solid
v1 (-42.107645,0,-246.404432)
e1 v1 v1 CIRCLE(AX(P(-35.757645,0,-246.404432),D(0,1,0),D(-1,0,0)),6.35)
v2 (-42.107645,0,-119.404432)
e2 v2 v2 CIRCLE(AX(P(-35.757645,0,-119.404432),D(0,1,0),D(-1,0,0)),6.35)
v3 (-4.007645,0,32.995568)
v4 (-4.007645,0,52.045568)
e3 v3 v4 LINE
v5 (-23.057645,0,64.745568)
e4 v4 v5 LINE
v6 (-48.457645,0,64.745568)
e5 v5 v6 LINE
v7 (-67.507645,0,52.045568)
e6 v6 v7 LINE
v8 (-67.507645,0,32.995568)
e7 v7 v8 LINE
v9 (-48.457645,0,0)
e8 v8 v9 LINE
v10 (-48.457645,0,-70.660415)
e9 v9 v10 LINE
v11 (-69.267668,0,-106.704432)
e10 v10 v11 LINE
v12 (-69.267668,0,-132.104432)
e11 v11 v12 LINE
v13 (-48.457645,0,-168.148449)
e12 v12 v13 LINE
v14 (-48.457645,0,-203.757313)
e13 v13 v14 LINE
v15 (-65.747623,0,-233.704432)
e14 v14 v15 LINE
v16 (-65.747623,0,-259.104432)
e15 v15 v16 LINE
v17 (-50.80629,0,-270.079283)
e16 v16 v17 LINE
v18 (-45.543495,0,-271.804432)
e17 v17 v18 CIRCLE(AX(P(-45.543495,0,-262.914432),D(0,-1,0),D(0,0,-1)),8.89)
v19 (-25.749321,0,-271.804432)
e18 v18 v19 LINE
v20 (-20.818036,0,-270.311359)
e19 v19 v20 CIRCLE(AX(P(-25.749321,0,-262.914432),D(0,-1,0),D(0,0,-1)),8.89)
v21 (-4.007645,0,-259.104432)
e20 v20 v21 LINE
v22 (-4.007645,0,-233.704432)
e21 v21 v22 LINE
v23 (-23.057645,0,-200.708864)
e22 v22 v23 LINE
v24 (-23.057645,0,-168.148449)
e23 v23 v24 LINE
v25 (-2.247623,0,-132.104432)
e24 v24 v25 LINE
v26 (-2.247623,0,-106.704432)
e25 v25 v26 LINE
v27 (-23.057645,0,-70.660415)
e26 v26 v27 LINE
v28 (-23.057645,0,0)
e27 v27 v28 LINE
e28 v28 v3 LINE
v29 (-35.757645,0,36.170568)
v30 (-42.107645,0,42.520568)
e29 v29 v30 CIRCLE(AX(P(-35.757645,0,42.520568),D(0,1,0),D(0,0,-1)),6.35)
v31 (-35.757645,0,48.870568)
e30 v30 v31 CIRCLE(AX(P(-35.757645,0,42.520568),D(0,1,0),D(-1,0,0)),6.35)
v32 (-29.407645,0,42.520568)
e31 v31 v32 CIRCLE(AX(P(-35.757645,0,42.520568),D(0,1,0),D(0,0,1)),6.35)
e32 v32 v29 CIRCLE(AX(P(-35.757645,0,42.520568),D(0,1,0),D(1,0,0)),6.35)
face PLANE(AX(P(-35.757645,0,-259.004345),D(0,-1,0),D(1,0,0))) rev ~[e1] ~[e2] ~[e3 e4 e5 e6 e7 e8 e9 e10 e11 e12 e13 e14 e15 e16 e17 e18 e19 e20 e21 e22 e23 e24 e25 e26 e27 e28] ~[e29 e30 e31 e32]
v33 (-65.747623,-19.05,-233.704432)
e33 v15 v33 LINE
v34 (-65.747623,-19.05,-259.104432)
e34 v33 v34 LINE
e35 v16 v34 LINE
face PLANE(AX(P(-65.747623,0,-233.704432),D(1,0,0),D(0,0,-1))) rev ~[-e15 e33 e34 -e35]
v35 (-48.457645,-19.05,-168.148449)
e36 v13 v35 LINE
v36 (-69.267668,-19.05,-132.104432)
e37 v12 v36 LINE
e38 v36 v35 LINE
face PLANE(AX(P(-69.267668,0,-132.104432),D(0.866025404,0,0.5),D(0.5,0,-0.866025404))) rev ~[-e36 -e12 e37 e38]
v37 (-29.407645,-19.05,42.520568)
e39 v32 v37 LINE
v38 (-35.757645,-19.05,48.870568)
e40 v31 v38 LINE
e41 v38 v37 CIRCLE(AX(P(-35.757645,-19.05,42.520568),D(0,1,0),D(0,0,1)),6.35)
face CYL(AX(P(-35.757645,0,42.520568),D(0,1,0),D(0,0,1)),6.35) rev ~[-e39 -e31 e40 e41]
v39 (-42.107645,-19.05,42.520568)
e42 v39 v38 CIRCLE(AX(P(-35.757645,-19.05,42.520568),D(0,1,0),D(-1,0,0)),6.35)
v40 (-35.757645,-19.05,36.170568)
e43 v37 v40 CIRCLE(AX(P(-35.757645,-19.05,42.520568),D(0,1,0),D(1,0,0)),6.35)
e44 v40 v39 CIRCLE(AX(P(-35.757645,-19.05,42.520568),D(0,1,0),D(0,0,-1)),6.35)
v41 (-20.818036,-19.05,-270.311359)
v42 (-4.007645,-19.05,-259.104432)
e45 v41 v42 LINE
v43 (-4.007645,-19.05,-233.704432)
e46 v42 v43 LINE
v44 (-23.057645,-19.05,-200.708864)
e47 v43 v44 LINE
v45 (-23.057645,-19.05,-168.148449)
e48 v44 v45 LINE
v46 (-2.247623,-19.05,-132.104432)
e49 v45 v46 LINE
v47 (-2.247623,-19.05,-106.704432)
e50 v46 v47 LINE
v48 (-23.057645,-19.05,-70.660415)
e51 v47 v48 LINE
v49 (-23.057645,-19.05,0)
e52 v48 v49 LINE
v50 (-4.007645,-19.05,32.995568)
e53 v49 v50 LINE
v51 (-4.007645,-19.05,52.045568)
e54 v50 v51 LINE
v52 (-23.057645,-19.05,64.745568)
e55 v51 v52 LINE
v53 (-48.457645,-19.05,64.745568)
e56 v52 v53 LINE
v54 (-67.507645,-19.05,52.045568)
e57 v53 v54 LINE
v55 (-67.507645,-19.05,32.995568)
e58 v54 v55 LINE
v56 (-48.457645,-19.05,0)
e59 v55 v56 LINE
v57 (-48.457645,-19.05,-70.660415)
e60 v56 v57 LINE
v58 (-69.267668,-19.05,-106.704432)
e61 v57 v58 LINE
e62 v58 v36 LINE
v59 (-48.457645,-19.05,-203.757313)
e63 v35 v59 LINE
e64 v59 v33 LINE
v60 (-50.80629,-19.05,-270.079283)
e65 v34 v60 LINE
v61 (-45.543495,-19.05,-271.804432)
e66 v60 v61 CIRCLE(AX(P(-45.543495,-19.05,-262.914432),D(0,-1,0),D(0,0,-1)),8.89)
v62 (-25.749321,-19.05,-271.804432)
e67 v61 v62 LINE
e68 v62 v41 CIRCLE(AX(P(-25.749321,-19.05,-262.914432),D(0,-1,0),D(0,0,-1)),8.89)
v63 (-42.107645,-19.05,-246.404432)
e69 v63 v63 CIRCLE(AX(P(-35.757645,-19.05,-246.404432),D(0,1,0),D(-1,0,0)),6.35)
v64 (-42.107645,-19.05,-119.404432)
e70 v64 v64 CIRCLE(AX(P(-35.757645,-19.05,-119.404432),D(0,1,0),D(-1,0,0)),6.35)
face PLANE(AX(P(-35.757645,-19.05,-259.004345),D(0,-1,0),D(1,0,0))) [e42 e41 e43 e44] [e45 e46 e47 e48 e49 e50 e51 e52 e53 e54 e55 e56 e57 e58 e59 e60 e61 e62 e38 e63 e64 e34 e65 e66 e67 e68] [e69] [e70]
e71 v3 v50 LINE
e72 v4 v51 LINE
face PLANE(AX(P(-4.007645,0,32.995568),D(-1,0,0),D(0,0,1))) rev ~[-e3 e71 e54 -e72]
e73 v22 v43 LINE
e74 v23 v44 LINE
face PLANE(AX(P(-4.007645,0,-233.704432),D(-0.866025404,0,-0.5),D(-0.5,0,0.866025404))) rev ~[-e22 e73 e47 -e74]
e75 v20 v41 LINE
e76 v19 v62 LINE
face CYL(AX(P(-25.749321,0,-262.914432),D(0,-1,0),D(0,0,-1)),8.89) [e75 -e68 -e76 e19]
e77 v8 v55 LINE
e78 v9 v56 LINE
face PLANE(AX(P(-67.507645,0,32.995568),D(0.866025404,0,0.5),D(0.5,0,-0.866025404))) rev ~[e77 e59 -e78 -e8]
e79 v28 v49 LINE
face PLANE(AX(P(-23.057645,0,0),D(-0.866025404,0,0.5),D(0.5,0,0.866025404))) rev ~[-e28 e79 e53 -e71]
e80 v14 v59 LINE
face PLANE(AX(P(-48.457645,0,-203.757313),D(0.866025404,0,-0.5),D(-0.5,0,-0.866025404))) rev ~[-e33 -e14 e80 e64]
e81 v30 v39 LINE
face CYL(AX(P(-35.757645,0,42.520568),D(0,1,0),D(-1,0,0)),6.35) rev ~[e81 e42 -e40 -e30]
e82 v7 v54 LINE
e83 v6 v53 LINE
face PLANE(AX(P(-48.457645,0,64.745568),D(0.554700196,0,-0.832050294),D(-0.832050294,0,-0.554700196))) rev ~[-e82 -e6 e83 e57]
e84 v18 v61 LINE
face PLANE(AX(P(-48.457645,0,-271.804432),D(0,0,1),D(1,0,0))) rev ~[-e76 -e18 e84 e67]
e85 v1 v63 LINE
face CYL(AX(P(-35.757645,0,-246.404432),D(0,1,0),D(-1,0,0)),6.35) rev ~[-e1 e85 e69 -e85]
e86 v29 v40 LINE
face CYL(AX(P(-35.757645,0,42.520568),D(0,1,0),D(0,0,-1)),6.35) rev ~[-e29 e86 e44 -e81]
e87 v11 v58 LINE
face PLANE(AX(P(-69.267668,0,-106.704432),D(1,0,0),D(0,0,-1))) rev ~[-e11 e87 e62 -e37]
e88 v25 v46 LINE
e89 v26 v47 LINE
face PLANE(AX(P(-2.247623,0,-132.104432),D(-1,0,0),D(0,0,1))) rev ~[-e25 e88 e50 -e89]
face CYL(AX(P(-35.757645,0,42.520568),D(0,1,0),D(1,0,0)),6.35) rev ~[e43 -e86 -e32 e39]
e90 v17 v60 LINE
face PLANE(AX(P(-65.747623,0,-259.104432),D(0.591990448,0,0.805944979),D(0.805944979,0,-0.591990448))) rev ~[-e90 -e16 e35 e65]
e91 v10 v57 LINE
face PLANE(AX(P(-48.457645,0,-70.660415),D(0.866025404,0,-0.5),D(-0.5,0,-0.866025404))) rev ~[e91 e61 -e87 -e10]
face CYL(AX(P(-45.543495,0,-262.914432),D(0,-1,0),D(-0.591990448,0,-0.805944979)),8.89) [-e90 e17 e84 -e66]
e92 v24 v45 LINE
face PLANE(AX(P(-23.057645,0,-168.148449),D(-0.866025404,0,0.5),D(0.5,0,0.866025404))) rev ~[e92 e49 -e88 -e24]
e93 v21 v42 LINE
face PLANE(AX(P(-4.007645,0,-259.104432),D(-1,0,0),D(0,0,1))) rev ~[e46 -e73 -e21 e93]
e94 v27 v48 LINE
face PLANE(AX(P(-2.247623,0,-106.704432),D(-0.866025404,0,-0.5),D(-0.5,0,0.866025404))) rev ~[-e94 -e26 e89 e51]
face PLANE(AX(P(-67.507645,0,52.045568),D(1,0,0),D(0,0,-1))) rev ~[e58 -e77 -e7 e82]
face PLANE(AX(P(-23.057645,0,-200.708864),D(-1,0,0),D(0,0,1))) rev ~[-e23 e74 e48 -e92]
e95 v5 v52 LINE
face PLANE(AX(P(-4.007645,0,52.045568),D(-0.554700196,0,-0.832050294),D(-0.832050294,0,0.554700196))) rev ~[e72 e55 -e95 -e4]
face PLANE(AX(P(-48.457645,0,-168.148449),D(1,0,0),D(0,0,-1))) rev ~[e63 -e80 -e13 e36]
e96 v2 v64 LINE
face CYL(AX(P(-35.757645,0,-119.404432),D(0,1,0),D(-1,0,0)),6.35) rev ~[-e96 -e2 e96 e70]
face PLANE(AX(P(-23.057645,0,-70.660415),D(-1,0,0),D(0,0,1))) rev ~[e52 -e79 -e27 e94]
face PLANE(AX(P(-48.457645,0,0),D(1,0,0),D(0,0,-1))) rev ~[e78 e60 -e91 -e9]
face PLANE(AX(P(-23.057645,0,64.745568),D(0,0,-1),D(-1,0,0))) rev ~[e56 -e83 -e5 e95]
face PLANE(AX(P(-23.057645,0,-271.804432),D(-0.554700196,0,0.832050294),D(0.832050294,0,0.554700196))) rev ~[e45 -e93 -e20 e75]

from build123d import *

# Parameters (mm, degrees)
F0_W     = 17.2899770278
F0_H     = 12.7
F0_W_2   = 19.05
F0_W_3   = 20.8100229722
F0_H_2   = 9.525
F1_DEPTH = 19.05
F2_R     = 8.89


# Not quite as in the source:
# - a feature names something its author has since deleted; it is built from what else it names


with BuildPart() as f1:
    # F0 (on Front) → F1 (new body)
    with BuildSketch(Plane.XZ):
        with BuildLine():
            Line((-48.4576454937, -259.1044321158), (-48.4576454937, -271.8044321158))
            Line((-48.4576454937, -271.8044321158), (-23.0576454937, -271.8044321158))
            Line((-23.0576454937, -271.8044321158), (-23.0576454937, -259.1044321158))
            Line((-23.0576454937, -259.1044321158), (-23.0576454937, -246.4044321158))
            Line((-23.0576454937, -246.4044321158), (-29.4076454937, -246.4044321158))
            ThreePointArc((-29.4076454937, -246.4044321158), (-35.7576454937, -252.7544321158), (-42.1076454937, -246.4044321158))
            Line((-42.1076454937, -246.4044321158), (-48.4576454937, -246.4044321158))
            Line((-48.4576454937, -246.4044321158), (-48.4576454937, -259.1044321158))
        make_face()
        Polygon((-65.7476225216, -259.1044321158), (-48.4576454937, -271.8044321158), (-48.4576454937, -259.1044321158), align=None)
        Polygon((-23.0576454937, -259.1044321158), (-23.0576454937, -271.8044321158), (-4.0076454937, -259.1044321158), align=None)
        with Locations((-57.1026340077, -252.7544321158)):
            Rectangle(F0_W, F0_H)
        with Locations((-13.5326454937, -252.7544321158)):
            Rectangle(F0_W_2, F0_H)
        with Locations((-57.1026340077, -240.0544321158)):
            Rectangle(F0_W, F0_H)
        with BuildLine():
            Line((-48.4576454937, -233.7044321158), (-48.4576454937, -246.4044321158))
            Line((-48.4576454937, -246.4044321158), (-42.1076454937, -246.4044321158))
            ThreePointArc((-42.1076454937, -246.4044321158), (-35.7576454937, -240.0544321158), (-29.4076454937, -246.4044321158))
            Line((-29.4076454937, -246.4044321158), (-23.0576454937, -246.4044321158))
            Line((-23.0576454937, -246.4044321158), (-23.0576454937, -233.7044321158))
            Line((-23.0576454937, -233.7044321158), (-23.0576454937, -200.7088642316))
            Line((-23.0576454937, -200.7088642316), (-23.0576454937, -168.1484492103))
            Line((-23.0576454937, -168.1484492103), (-23.0576454937, -132.1044321158))
            Line((-23.0576454937, -132.1044321158), (-23.0576454937, -119.4044321158))
            Line((-23.0576454937, -119.4044321158), (-29.4076454937, -119.4044321158))
            ThreePointArc((-29.4076454937, -119.4044321158), (-35.7576454937, -125.7544321158), (-42.1076454937, -119.4044321158))
            Line((-42.1076454937, -119.4044321158), (-48.4576454937, -119.4044321158))
            Line((-48.4576454937, -119.4044321158), (-48.4576454937, -132.1044321158))
            Line((-48.4576454937, -132.1044321158), (-48.4576454937, -168.1484492103))
            Line((-48.4576454937, -168.1484492103), (-48.4576454937, -203.7573134419))
            Line((-48.4576454937, -203.7573134419), (-48.4576454937, -233.7044321158))
        make_face()
        with Locations((-13.5326454937, -240.0544321158)):
            Rectangle(F0_W_2, F0_H)
        Polygon((-65.7476225216, -233.7044321158), (-48.4576454937, -233.7044321158), (-48.4576454937, -203.7573134419), align=None)
        Polygon((-23.0576454937, -200.7088642316), (-23.0576454937, -233.7044321158), (-4.0076454937, -233.7044321158), align=None)
        Polygon((-69.2676684659, -132.1044321158), (-48.4576454937, -168.1484492103), (-48.4576454937, -132.1044321158), align=None)
        Polygon((-23.0576454937, -132.1044321158), (-23.0576454937, -168.1484492103), (-2.2476225216, -132.1044321158), align=None)
        with Locations((-58.8626569798, -125.7544321158)):
            Rectangle(F0_W_3, F0_H)
        with Locations((-12.6526340077, -125.7544321158)):
            Rectangle(F0_W_3, F0_H)
        with Locations((-58.8626569798, -113.0544321158)):
            Rectangle(F0_W_3, F0_H)
        with BuildLine():
            Line((-48.4576454937, -106.7044321158), (-48.4576454937, -119.4044321158))
            Line((-48.4576454937, -119.4044321158), (-42.1076454937, -119.4044321158))
            ThreePointArc((-42.1076454937, -119.4044321158), (-35.7576454937, -113.0544321158), (-29.4076454937, -119.4044321158))
            Line((-29.4076454937, -119.4044321158), (-23.0576454937, -119.4044321158))
            Line((-23.0576454937, -119.4044321158), (-23.0576454937, -106.7044321158))
            Line((-23.0576454937, -106.7044321158), (-23.0576454937, -70.6604150213))
            Line((-23.0576454937, -70.6604150213), (-23.0576454937, 0))
            Line((-23.0576454937, 0), (-23.0576454937, 32.9955678842))
            Line((-23.0576454937, 32.9955678842), (-35.7576454937, 32.9955678842))
            Line((-35.7576454937, 32.9955678842), (-48.4576454937, 32.9955678842))
            Line((-48.4576454937, 32.9955678842), (-48.4576454937, 0))
            Line((-48.4576454937, 0), (-48.4576454937, -70.6604150213))
            Line((-48.4576454937, -70.6604150213), (-48.4576454937, -106.7044321158))
        make_face()
        with Locations((-12.6526340077, -113.0544321158)):
            Rectangle(F0_W_3, F0_H)
        Polygon((-69.2676684659, -106.7044321158), (-48.4576454937, -106.7044321158), (-48.4576454937, -70.6604150213), align=None)
        Polygon((-23.0576454937, -70.6604150213), (-23.0576454937, -106.7044321158), (-2.2476225216, -106.7044321158), align=None)
        Polygon((-67.5076454937, 32.9955678842), (-48.4576454937, 0), (-48.4576454937, 32.9955678842), align=None)
        Polygon((-23.0576454937, 32.9955678842), (-23.0576454937, 0), (-4.0076454937, 32.9955678842), align=None)
        with Locations((-57.9826454937, 37.7580678842)):
            Rectangle(F0_W_2, F0_H_2)
        with Locations((-13.5326454937, 37.7580678842)):
            Rectangle(F0_W_2, F0_H_2)
        with Locations((-57.9826454937, 47.2830678842)):
            Rectangle(F0_W_2, F0_H_2)
        with Locations((-13.5326454937, 47.2830678842)):
            Rectangle(F0_W_2, F0_H_2)
        Polygon((-48.4576454937, 64.7455678842), (-48.4576454937, 52.0455678842), (-35.7576454937, 52.0455678842), (-23.0576454937, 52.0455678842), (-23.0576454937, 64.7455678842), align=None)
        Polygon((-67.5076454937, 52.0455678842), (-48.4576454937, 52.0455678842), (-48.4576454937, 64.7455678842), align=None)
        Polygon((-23.0576454937, 64.7455678842), (-23.0576454937, 52.0455678842), (-4.0076454937, 52.0455678842), align=None)
        with BuildLine():
            Line((-29.4076454937, 42.5205678842), (-23.0576454937, 42.5205678842))
            Line((-23.0576454937, 42.5205678842), (-23.0576454937, 52.0455678842))
            Line((-23.0576454937, 52.0455678842), (-35.7576454937, 52.0455678842))
            Line((-35.7576454937, 52.0455678842), (-35.7576454937, 48.8705678842))
            ThreePointArc((-35.7576454937, 48.8705678842), (-31.2675174332, 47.0106959447), (-29.4076454937, 42.5205678842))
        make_face()
        with BuildLine():
            Line((-48.4576454937, 52.0455678842), (-48.4576454937, 42.5205678842))
            Line((-48.4576454937, 42.5205678842), (-42.1076454937, 42.5205678842))
            ThreePointArc((-42.1076454937, 42.5205678842), (-40.2477735543, 47.0106959447), (-35.7576454937, 48.8705678842))
            Line((-35.7576454937, 48.8705678842), (-35.7576454937, 52.0455678842))
            Line((-35.7576454937, 52.0455678842), (-48.4576454937, 52.0455678842))
        make_face()
        with BuildLine():
            Line((-35.7576454937, 32.9955678842), (-23.0576454937, 32.9955678842))
            Line((-23.0576454937, 32.9955678842), (-23.0576454937, 42.5205678842))
            Line((-23.0576454937, 42.5205678842), (-29.4076454937, 42.5205678842))
            ThreePointArc((-29.4076454937, 42.5205678842), (-31.2675174332, 38.0304398237), (-35.7576454937, 36.1705678842))
            Line((-35.7576454937, 36.1705678842), (-35.7576454937, 32.9955678842))
        make_face()
        with BuildLine():
            Line((-48.4576454937, 42.5205678842), (-48.4576454937, 32.9955678842))
            Line((-48.4576454937, 32.9955678842), (-35.7576454937, 32.9955678842))
            Line((-35.7576454937, 32.9955678842), (-35.7576454937, 36.1705678842))
            ThreePointArc((-35.7576454937, 36.1705678842), (-40.2477735543, 38.0304398237), (-42.1076454937, 42.5205678842))
            Line((-42.1076454937, 42.5205678842), (-48.4576454937, 42.5205678842))
        make_face()
    extrude(amount=F1_DEPTH)

    # F2
    f2_edges = [f1.edges().sort_by_distance(p)[0] for p in [
        (-23.057645, -9.525, -271.804432),
        (-48.457645, -9.525, -271.804432),
    ]]
    fillet(f2_edges, radius=F2_R)


solid = f1.part
